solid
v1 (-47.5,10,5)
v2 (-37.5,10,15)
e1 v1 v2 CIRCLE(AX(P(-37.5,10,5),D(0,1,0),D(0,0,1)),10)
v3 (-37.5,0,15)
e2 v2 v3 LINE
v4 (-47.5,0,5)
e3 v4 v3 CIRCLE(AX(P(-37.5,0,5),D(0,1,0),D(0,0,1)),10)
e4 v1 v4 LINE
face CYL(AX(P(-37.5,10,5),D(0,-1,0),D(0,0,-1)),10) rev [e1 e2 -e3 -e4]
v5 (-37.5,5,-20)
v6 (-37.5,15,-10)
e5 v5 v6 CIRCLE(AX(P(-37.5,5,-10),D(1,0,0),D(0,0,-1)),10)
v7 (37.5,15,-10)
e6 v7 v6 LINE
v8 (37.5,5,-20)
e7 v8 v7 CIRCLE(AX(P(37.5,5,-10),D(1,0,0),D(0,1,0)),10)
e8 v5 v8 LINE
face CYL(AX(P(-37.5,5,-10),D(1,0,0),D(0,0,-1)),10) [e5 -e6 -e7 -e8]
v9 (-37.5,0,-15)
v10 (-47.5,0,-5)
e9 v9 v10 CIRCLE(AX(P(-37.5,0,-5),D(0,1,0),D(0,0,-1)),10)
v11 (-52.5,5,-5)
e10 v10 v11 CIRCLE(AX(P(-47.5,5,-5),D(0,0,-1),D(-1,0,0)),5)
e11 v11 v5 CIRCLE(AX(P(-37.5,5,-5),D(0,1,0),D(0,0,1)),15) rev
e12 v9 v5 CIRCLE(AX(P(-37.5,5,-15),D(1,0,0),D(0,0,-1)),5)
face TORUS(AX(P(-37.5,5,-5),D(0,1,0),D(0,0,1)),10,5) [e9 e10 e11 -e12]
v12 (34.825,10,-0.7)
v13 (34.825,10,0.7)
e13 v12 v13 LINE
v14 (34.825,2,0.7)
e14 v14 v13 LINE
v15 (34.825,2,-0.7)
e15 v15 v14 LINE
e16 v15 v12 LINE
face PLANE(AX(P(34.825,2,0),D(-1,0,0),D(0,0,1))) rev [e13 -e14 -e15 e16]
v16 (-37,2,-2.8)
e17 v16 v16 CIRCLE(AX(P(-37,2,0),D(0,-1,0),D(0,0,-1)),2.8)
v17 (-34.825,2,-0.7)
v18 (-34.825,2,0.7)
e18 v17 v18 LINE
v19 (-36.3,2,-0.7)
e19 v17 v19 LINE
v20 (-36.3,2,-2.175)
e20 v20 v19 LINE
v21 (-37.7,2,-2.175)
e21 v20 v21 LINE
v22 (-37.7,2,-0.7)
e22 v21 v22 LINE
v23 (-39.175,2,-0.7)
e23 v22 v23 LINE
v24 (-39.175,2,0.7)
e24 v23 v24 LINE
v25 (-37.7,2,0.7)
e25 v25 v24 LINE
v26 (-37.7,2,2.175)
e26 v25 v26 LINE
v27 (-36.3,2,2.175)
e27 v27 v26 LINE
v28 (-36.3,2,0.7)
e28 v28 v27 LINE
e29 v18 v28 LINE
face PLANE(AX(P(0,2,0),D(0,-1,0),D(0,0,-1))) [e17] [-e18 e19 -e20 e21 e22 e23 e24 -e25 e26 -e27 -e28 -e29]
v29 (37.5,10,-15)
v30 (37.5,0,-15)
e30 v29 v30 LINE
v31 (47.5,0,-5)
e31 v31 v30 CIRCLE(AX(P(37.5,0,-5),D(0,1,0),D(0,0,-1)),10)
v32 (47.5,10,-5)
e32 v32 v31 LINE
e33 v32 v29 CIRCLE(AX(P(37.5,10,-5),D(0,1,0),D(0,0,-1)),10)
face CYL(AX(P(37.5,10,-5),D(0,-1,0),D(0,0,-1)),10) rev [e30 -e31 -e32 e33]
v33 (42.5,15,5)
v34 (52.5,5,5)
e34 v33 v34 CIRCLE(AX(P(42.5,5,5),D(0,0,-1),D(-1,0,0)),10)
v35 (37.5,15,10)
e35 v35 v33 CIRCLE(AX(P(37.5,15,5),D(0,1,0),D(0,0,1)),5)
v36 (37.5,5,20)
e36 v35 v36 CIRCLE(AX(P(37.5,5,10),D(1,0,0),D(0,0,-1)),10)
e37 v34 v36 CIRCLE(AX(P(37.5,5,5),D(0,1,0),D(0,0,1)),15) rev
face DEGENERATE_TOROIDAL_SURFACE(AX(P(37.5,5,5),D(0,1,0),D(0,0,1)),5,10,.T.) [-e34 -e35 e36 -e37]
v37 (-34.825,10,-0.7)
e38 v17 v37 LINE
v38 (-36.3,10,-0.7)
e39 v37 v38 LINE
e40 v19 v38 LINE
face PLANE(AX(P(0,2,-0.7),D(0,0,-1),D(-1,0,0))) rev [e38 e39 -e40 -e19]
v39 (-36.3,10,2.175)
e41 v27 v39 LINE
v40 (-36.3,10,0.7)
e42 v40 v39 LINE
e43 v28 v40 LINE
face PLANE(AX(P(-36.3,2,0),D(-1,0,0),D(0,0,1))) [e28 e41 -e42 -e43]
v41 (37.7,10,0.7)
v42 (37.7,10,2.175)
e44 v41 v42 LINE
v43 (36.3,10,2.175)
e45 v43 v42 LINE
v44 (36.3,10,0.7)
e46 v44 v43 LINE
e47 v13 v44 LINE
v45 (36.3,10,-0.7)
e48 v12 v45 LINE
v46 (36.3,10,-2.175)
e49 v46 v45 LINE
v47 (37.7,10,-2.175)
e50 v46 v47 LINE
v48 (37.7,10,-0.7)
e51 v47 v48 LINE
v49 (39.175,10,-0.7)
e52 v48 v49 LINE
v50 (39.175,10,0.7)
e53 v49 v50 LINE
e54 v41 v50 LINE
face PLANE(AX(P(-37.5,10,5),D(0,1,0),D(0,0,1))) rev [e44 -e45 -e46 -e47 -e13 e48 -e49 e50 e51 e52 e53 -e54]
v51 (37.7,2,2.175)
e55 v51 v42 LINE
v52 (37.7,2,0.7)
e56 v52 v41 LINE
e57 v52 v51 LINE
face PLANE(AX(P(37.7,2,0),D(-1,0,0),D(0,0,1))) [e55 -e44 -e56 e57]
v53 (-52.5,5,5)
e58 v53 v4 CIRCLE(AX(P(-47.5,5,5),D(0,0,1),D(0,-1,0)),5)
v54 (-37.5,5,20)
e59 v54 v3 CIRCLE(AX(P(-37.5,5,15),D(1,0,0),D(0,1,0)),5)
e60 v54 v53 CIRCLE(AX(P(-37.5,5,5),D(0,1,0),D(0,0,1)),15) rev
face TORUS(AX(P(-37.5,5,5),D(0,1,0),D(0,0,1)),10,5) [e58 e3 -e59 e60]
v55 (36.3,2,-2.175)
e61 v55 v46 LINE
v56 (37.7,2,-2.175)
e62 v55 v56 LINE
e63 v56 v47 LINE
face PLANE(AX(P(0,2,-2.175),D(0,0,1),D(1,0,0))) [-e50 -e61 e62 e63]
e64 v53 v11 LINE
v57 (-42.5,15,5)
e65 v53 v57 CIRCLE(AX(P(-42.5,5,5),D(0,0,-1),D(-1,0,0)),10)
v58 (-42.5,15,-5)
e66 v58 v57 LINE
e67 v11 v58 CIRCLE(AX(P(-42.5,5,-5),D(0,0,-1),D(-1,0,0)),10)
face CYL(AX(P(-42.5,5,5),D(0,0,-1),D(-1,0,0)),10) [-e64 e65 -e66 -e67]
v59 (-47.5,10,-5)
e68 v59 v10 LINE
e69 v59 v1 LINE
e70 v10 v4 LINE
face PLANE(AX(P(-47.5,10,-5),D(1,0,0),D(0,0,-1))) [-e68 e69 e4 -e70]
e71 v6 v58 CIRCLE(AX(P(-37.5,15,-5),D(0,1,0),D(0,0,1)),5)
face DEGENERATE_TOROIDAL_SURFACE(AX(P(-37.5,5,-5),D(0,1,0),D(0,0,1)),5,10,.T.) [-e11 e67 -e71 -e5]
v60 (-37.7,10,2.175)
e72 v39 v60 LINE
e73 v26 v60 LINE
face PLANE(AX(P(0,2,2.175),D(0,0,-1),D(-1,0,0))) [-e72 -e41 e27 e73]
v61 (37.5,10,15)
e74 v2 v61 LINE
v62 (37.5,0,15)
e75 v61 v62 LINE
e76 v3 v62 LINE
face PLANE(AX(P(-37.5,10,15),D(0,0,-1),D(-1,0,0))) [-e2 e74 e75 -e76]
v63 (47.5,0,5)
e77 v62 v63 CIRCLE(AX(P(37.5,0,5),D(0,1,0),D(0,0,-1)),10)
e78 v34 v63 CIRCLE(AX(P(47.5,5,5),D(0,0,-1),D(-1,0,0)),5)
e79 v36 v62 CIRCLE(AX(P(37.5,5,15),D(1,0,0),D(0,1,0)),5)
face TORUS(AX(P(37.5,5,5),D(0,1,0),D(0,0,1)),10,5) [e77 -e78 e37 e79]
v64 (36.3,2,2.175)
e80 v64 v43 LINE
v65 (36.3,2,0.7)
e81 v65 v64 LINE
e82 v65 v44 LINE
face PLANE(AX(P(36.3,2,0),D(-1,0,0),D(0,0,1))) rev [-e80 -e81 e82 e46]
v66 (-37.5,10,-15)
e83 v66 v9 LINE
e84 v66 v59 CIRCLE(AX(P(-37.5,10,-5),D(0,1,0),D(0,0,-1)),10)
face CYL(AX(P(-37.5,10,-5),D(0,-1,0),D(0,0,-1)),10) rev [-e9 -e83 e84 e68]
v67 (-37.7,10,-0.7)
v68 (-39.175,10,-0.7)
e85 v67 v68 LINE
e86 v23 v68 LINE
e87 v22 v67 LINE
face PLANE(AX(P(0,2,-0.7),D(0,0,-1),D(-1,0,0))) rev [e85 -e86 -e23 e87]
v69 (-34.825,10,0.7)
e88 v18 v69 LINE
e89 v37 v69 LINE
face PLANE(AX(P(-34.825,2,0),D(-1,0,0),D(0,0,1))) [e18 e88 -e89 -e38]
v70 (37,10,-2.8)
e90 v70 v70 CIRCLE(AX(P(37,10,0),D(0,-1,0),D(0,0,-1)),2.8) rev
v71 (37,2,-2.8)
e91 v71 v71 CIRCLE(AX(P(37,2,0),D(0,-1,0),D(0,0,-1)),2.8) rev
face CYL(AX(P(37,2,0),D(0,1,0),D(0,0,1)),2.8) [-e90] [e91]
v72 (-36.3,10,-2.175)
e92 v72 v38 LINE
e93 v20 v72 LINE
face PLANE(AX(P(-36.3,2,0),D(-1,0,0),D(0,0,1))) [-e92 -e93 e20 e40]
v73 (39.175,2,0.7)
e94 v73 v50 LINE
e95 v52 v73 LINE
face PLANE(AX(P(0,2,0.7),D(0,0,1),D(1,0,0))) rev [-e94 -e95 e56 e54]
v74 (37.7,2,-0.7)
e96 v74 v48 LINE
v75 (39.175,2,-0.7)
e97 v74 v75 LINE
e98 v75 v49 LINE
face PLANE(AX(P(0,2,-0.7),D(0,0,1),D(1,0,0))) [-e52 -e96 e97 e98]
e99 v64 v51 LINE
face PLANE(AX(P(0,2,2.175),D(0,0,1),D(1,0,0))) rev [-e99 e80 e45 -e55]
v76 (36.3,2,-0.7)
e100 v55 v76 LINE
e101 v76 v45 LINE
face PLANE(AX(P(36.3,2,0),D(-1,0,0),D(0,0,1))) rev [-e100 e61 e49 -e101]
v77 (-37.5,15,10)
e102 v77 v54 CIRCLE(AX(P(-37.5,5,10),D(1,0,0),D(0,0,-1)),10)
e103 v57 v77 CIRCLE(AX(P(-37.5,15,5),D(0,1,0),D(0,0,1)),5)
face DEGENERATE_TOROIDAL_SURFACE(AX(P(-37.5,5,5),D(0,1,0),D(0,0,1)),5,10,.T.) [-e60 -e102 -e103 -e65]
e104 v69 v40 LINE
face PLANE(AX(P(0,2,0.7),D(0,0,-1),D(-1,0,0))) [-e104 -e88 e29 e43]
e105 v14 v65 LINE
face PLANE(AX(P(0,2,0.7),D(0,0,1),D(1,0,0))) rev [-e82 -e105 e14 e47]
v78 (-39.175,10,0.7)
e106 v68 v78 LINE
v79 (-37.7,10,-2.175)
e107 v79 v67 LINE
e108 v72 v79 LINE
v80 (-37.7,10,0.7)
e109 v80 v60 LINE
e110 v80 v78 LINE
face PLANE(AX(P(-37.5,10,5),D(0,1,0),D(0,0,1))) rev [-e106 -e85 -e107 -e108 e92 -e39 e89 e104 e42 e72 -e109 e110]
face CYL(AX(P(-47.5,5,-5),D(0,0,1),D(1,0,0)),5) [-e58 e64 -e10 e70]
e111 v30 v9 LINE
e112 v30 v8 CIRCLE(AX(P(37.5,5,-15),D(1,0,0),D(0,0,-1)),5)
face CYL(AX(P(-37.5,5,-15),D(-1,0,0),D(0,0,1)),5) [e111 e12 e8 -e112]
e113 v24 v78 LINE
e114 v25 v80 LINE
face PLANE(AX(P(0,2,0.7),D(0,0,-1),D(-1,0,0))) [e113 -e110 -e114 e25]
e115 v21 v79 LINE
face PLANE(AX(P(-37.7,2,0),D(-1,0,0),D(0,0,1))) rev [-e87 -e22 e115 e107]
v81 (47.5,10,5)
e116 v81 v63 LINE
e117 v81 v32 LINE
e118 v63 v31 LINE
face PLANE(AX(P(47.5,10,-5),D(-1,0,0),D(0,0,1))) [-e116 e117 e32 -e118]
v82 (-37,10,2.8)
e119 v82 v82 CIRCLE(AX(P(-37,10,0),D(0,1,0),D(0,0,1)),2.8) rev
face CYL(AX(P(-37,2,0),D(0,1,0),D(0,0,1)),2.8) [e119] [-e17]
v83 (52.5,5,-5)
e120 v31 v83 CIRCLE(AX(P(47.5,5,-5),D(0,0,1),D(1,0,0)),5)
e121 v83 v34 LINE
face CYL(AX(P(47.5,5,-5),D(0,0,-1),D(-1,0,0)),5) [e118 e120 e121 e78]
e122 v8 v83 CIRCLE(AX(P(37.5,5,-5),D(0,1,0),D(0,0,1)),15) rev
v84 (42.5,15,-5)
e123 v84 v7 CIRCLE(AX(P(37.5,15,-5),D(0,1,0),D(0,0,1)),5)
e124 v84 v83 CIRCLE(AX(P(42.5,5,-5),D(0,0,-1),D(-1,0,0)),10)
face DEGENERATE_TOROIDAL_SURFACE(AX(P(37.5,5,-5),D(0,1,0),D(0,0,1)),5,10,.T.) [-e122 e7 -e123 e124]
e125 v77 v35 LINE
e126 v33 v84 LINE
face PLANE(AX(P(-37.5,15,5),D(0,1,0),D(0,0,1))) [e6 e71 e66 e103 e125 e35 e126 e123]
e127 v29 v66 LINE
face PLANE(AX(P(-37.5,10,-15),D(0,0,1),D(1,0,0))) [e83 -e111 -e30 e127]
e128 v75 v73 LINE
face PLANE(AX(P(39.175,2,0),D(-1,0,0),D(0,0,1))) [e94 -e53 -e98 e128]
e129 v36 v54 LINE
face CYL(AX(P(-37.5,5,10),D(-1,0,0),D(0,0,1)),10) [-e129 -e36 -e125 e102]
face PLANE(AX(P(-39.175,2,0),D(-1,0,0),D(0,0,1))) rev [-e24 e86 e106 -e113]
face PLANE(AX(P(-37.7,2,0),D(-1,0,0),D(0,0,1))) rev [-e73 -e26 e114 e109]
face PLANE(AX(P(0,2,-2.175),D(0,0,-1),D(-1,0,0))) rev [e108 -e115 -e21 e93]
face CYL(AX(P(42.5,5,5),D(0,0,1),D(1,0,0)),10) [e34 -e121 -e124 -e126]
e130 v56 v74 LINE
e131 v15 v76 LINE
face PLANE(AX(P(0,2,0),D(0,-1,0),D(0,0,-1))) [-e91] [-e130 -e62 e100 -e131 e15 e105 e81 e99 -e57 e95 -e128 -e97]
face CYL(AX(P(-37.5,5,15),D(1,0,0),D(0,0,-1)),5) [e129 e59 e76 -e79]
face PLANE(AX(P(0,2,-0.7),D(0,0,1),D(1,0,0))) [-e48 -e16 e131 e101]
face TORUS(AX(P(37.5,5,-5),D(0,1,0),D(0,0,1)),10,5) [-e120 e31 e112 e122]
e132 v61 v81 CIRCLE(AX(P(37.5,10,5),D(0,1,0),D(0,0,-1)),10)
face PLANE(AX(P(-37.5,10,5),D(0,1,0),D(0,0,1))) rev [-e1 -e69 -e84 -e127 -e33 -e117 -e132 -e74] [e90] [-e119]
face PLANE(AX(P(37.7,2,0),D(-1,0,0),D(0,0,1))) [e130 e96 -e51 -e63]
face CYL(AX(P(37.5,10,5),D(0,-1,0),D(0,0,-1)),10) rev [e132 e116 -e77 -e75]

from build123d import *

# Parameters (mm, degrees)
EXTRUDE_1_DEPTH = 10
SHELL_2_T       = 5
FILLET_3_R      = 10
FILLET_4_R      = 5
SKETCH_2_R      = 2.8
EXTRUDE_2_DEPTH = 8


# Some blends are built 0.0001 mm under size
with BuildPart() as part:
    # 草图1 → 凸台-拉伸1 (new body)
    with BuildSketch(Plane(origin=(0, 0, 0), x_dir=(1, 0, 0), z_dir=(0, 1, 0))):
        with BuildLine():
            Line((-37.5, 15), (37.5, 15))
            ThreePointArc((37.5, 15), (44.571067812, 12.071067812), (47.5, 5))
            Line((47.5, 5), (47.5, -5))
            ThreePointArc((47.5, -5), (44.571067812, -12.071067812), (37.5, -15))
            Line((37.5, -15), (-37.5, -15))
            ThreePointArc((-37.5, -15), (-44.571067812, -12.071067812), (-47.5, -5))
            Line((-47.5, -5), (-47.5, 5))
            ThreePointArc((-47.5, 5), (-44.571067812, 12.071067812), (-37.5, 15))
        make_face()
    extrude(amount=EXTRUDE_1_DEPTH)

    # 抽壳2
    shell_2_openings = [part.faces().sort_by_distance(p)[0] for p in [
        (0, 0, 0),
    ]]
    offset(amount=SHELL_2_T, openings=shell_2_openings, kind=Kind.INTERSECTION)

    # 圆角3
    # the kernel refuses this fillet: 10 mm, written as the material it takes off along each edge
    with BuildSketch(Plane(origin=(37.5, 15, 5), x_dir=(1, 0, 0), z_dir=(0, 0, -1))) as fillet_3_piece_1:
        with BuildLine():
            CenterArc((15 - FILLET_3_R, FILLET_3_R), FILLET_3_R, 270, 90)
            Line((15 - FILLET_3_R, 0), (15, 0))
            Line((15, 0), (15, FILLET_3_R))
        make_face()
    revolve(axis=Axis((37.5, 15, 5), (0, -1, 0)), revolution_arc=90, mode=Mode.SUBTRACT)
    with BuildSketch(Plane(origin=(52.5, 15, 5), x_dir=(0, -1, 0), z_dir=(0, 0, -1)), Plane(origin=(-52.5, 15, -5), x_dir=(0, -1, 0), z_dir=(0, 0, 1))) as fillet_3_piece_2:
        with BuildLine():
            CenterArc((FILLET_3_R, FILLET_3_R), FILLET_3_R, 180, 90)
            Line((0, FILLET_3_R), (0, 0))
            Line((0, 0), (FILLET_3_R, 0))
        make_face()
    extrude(amount=10, mode=Mode.SUBTRACT)
    with BuildSketch(Plane(origin=(37.5, 15, -5), x_dir=(0, 0, -1), z_dir=(-1, 0, 0))) as fillet_3_piece_3:
        with BuildLine():
            CenterArc((15 - FILLET_3_R, FILLET_3_R), FILLET_3_R, 270, 90)
            Line((15 - FILLET_3_R, 0), (15, 0))
            Line((15, 0), (15, FILLET_3_R))
        make_face()
    revolve(axis=Axis((37.5, 15, -5), (0, -1, 0)), revolution_arc=90, mode=Mode.SUBTRACT)
    with BuildSketch(Plane(origin=(37.5, 15, -20), x_dir=(0, -1, 0), z_dir=(-1, 0, 0)), Plane(origin=(-37.5, 15, 20), x_dir=(0, -1, 0), z_dir=(1, 0, 0))) as fillet_3_piece_4:
        with BuildLine():
            CenterArc((FILLET_3_R, FILLET_3_R), FILLET_3_R, 180, 90)
            Line((0, FILLET_3_R), (0, 0))
            Line((0, 0), (FILLET_3_R, 0))
        make_face()
    extrude(amount=75, mode=Mode.SUBTRACT)
    with BuildSketch(Plane(origin=(-37.5, 15, -5), x_dir=(-1, 0, 0), z_dir=(0, 0, 1))) as fillet_3_piece_5:
        with BuildLine():
            CenterArc((15 - FILLET_3_R, FILLET_3_R), FILLET_3_R, 270, 90)
            Line((15 - FILLET_3_R, 0), (15, 0))
            Line((15, 0), (15, FILLET_3_R))
        make_face()
    revolve(axis=Axis((-37.5, 15, -5), (0, -1, 0)), revolution_arc=90, mode=Mode.SUBTRACT)
    with BuildSketch(Plane(origin=(-37.5, 15, 5), x_dir=(0, 0, 1), z_dir=(1, 0, 0))) as fillet_3_piece_6:
        with BuildLine():
            CenterArc((15 - FILLET_3_R, FILLET_3_R), FILLET_3_R, 270, 90)
            Line((15 - FILLET_3_R, 0), (15, 0))
            Line((15, 0), (15, FILLET_3_R))
        make_face()
    revolve(axis=Axis((-37.5, 15, 5), (0, -1, 0)), revolution_arc=90, mode=Mode.SUBTRACT)

    # 圆角4
    fillet_4_edges = [part.edges().sort_by_distance(p)[0] for p in [
        (52.5, 0, 0),
        (48.106601718, 0, 15.606601718),
        (0, 0, 20),
        (-48.106601718, 0, 15.606601718),
        (-52.5, 0, 0),
        (-48.106601718, 0, -15.606601718),
        (0, 0, -20),
        (48.106601718, 0, -15.606601718),
    ]]
    fillet(fillet_4_edges, radius=FILLET_4_R - 0.0001)  # a hair under: the kernel refuses the full size

    # 草图2 → 凸台-拉伸2 (add)
    # profile 1 of 2: a face of its own
    with BuildSketch(Plane(origin=(0, 10, 0), x_dir=(-1, 0, 0), z_dir=(0, -1, 0))):
        with Locations(Location((37, 0, 0), (0, 0, 270))):
            Circle(SKETCH_2_R)
        Polygon((34.825, -0.7), (34.825, 0.7), (36.3, 0.7), (36.3, 2.175), (37.7, 2.175), (37.7, 0.7), (39.175, 0.7), (39.175, -0.7), (37.7, -0.7), (37.7, -2.175), (36.3, -2.175), (36.3, -0.7), align=None, mode=Mode.SUBTRACT)
    # profile 2 of 2: a face of its own
    with BuildSketch(Plane(origin=(0, 10, 0), x_dir=(-1, 0, 0), z_dir=(0, -1, 0))):
        with Locations(Location((-37, 0, 0), (0, 0, 90))):
            Circle(SKETCH_2_R)
        Polygon((-37.7, 0.7), (-37.7, 2.175), (-36.3, 2.175), (-36.3, 0.7), (-34.825, 0.7), (-34.825, -0.7), (-36.3, -0.7), (-36.3, -2.175), (-37.7, -2.175), (-37.7, -0.7), (-39.175, -0.7), (-39.175, 0.7), align=None, mode=Mode.SUBTRACT)
    extrude(amount=EXTRUDE_2_DEPTH)


solid = part.part
